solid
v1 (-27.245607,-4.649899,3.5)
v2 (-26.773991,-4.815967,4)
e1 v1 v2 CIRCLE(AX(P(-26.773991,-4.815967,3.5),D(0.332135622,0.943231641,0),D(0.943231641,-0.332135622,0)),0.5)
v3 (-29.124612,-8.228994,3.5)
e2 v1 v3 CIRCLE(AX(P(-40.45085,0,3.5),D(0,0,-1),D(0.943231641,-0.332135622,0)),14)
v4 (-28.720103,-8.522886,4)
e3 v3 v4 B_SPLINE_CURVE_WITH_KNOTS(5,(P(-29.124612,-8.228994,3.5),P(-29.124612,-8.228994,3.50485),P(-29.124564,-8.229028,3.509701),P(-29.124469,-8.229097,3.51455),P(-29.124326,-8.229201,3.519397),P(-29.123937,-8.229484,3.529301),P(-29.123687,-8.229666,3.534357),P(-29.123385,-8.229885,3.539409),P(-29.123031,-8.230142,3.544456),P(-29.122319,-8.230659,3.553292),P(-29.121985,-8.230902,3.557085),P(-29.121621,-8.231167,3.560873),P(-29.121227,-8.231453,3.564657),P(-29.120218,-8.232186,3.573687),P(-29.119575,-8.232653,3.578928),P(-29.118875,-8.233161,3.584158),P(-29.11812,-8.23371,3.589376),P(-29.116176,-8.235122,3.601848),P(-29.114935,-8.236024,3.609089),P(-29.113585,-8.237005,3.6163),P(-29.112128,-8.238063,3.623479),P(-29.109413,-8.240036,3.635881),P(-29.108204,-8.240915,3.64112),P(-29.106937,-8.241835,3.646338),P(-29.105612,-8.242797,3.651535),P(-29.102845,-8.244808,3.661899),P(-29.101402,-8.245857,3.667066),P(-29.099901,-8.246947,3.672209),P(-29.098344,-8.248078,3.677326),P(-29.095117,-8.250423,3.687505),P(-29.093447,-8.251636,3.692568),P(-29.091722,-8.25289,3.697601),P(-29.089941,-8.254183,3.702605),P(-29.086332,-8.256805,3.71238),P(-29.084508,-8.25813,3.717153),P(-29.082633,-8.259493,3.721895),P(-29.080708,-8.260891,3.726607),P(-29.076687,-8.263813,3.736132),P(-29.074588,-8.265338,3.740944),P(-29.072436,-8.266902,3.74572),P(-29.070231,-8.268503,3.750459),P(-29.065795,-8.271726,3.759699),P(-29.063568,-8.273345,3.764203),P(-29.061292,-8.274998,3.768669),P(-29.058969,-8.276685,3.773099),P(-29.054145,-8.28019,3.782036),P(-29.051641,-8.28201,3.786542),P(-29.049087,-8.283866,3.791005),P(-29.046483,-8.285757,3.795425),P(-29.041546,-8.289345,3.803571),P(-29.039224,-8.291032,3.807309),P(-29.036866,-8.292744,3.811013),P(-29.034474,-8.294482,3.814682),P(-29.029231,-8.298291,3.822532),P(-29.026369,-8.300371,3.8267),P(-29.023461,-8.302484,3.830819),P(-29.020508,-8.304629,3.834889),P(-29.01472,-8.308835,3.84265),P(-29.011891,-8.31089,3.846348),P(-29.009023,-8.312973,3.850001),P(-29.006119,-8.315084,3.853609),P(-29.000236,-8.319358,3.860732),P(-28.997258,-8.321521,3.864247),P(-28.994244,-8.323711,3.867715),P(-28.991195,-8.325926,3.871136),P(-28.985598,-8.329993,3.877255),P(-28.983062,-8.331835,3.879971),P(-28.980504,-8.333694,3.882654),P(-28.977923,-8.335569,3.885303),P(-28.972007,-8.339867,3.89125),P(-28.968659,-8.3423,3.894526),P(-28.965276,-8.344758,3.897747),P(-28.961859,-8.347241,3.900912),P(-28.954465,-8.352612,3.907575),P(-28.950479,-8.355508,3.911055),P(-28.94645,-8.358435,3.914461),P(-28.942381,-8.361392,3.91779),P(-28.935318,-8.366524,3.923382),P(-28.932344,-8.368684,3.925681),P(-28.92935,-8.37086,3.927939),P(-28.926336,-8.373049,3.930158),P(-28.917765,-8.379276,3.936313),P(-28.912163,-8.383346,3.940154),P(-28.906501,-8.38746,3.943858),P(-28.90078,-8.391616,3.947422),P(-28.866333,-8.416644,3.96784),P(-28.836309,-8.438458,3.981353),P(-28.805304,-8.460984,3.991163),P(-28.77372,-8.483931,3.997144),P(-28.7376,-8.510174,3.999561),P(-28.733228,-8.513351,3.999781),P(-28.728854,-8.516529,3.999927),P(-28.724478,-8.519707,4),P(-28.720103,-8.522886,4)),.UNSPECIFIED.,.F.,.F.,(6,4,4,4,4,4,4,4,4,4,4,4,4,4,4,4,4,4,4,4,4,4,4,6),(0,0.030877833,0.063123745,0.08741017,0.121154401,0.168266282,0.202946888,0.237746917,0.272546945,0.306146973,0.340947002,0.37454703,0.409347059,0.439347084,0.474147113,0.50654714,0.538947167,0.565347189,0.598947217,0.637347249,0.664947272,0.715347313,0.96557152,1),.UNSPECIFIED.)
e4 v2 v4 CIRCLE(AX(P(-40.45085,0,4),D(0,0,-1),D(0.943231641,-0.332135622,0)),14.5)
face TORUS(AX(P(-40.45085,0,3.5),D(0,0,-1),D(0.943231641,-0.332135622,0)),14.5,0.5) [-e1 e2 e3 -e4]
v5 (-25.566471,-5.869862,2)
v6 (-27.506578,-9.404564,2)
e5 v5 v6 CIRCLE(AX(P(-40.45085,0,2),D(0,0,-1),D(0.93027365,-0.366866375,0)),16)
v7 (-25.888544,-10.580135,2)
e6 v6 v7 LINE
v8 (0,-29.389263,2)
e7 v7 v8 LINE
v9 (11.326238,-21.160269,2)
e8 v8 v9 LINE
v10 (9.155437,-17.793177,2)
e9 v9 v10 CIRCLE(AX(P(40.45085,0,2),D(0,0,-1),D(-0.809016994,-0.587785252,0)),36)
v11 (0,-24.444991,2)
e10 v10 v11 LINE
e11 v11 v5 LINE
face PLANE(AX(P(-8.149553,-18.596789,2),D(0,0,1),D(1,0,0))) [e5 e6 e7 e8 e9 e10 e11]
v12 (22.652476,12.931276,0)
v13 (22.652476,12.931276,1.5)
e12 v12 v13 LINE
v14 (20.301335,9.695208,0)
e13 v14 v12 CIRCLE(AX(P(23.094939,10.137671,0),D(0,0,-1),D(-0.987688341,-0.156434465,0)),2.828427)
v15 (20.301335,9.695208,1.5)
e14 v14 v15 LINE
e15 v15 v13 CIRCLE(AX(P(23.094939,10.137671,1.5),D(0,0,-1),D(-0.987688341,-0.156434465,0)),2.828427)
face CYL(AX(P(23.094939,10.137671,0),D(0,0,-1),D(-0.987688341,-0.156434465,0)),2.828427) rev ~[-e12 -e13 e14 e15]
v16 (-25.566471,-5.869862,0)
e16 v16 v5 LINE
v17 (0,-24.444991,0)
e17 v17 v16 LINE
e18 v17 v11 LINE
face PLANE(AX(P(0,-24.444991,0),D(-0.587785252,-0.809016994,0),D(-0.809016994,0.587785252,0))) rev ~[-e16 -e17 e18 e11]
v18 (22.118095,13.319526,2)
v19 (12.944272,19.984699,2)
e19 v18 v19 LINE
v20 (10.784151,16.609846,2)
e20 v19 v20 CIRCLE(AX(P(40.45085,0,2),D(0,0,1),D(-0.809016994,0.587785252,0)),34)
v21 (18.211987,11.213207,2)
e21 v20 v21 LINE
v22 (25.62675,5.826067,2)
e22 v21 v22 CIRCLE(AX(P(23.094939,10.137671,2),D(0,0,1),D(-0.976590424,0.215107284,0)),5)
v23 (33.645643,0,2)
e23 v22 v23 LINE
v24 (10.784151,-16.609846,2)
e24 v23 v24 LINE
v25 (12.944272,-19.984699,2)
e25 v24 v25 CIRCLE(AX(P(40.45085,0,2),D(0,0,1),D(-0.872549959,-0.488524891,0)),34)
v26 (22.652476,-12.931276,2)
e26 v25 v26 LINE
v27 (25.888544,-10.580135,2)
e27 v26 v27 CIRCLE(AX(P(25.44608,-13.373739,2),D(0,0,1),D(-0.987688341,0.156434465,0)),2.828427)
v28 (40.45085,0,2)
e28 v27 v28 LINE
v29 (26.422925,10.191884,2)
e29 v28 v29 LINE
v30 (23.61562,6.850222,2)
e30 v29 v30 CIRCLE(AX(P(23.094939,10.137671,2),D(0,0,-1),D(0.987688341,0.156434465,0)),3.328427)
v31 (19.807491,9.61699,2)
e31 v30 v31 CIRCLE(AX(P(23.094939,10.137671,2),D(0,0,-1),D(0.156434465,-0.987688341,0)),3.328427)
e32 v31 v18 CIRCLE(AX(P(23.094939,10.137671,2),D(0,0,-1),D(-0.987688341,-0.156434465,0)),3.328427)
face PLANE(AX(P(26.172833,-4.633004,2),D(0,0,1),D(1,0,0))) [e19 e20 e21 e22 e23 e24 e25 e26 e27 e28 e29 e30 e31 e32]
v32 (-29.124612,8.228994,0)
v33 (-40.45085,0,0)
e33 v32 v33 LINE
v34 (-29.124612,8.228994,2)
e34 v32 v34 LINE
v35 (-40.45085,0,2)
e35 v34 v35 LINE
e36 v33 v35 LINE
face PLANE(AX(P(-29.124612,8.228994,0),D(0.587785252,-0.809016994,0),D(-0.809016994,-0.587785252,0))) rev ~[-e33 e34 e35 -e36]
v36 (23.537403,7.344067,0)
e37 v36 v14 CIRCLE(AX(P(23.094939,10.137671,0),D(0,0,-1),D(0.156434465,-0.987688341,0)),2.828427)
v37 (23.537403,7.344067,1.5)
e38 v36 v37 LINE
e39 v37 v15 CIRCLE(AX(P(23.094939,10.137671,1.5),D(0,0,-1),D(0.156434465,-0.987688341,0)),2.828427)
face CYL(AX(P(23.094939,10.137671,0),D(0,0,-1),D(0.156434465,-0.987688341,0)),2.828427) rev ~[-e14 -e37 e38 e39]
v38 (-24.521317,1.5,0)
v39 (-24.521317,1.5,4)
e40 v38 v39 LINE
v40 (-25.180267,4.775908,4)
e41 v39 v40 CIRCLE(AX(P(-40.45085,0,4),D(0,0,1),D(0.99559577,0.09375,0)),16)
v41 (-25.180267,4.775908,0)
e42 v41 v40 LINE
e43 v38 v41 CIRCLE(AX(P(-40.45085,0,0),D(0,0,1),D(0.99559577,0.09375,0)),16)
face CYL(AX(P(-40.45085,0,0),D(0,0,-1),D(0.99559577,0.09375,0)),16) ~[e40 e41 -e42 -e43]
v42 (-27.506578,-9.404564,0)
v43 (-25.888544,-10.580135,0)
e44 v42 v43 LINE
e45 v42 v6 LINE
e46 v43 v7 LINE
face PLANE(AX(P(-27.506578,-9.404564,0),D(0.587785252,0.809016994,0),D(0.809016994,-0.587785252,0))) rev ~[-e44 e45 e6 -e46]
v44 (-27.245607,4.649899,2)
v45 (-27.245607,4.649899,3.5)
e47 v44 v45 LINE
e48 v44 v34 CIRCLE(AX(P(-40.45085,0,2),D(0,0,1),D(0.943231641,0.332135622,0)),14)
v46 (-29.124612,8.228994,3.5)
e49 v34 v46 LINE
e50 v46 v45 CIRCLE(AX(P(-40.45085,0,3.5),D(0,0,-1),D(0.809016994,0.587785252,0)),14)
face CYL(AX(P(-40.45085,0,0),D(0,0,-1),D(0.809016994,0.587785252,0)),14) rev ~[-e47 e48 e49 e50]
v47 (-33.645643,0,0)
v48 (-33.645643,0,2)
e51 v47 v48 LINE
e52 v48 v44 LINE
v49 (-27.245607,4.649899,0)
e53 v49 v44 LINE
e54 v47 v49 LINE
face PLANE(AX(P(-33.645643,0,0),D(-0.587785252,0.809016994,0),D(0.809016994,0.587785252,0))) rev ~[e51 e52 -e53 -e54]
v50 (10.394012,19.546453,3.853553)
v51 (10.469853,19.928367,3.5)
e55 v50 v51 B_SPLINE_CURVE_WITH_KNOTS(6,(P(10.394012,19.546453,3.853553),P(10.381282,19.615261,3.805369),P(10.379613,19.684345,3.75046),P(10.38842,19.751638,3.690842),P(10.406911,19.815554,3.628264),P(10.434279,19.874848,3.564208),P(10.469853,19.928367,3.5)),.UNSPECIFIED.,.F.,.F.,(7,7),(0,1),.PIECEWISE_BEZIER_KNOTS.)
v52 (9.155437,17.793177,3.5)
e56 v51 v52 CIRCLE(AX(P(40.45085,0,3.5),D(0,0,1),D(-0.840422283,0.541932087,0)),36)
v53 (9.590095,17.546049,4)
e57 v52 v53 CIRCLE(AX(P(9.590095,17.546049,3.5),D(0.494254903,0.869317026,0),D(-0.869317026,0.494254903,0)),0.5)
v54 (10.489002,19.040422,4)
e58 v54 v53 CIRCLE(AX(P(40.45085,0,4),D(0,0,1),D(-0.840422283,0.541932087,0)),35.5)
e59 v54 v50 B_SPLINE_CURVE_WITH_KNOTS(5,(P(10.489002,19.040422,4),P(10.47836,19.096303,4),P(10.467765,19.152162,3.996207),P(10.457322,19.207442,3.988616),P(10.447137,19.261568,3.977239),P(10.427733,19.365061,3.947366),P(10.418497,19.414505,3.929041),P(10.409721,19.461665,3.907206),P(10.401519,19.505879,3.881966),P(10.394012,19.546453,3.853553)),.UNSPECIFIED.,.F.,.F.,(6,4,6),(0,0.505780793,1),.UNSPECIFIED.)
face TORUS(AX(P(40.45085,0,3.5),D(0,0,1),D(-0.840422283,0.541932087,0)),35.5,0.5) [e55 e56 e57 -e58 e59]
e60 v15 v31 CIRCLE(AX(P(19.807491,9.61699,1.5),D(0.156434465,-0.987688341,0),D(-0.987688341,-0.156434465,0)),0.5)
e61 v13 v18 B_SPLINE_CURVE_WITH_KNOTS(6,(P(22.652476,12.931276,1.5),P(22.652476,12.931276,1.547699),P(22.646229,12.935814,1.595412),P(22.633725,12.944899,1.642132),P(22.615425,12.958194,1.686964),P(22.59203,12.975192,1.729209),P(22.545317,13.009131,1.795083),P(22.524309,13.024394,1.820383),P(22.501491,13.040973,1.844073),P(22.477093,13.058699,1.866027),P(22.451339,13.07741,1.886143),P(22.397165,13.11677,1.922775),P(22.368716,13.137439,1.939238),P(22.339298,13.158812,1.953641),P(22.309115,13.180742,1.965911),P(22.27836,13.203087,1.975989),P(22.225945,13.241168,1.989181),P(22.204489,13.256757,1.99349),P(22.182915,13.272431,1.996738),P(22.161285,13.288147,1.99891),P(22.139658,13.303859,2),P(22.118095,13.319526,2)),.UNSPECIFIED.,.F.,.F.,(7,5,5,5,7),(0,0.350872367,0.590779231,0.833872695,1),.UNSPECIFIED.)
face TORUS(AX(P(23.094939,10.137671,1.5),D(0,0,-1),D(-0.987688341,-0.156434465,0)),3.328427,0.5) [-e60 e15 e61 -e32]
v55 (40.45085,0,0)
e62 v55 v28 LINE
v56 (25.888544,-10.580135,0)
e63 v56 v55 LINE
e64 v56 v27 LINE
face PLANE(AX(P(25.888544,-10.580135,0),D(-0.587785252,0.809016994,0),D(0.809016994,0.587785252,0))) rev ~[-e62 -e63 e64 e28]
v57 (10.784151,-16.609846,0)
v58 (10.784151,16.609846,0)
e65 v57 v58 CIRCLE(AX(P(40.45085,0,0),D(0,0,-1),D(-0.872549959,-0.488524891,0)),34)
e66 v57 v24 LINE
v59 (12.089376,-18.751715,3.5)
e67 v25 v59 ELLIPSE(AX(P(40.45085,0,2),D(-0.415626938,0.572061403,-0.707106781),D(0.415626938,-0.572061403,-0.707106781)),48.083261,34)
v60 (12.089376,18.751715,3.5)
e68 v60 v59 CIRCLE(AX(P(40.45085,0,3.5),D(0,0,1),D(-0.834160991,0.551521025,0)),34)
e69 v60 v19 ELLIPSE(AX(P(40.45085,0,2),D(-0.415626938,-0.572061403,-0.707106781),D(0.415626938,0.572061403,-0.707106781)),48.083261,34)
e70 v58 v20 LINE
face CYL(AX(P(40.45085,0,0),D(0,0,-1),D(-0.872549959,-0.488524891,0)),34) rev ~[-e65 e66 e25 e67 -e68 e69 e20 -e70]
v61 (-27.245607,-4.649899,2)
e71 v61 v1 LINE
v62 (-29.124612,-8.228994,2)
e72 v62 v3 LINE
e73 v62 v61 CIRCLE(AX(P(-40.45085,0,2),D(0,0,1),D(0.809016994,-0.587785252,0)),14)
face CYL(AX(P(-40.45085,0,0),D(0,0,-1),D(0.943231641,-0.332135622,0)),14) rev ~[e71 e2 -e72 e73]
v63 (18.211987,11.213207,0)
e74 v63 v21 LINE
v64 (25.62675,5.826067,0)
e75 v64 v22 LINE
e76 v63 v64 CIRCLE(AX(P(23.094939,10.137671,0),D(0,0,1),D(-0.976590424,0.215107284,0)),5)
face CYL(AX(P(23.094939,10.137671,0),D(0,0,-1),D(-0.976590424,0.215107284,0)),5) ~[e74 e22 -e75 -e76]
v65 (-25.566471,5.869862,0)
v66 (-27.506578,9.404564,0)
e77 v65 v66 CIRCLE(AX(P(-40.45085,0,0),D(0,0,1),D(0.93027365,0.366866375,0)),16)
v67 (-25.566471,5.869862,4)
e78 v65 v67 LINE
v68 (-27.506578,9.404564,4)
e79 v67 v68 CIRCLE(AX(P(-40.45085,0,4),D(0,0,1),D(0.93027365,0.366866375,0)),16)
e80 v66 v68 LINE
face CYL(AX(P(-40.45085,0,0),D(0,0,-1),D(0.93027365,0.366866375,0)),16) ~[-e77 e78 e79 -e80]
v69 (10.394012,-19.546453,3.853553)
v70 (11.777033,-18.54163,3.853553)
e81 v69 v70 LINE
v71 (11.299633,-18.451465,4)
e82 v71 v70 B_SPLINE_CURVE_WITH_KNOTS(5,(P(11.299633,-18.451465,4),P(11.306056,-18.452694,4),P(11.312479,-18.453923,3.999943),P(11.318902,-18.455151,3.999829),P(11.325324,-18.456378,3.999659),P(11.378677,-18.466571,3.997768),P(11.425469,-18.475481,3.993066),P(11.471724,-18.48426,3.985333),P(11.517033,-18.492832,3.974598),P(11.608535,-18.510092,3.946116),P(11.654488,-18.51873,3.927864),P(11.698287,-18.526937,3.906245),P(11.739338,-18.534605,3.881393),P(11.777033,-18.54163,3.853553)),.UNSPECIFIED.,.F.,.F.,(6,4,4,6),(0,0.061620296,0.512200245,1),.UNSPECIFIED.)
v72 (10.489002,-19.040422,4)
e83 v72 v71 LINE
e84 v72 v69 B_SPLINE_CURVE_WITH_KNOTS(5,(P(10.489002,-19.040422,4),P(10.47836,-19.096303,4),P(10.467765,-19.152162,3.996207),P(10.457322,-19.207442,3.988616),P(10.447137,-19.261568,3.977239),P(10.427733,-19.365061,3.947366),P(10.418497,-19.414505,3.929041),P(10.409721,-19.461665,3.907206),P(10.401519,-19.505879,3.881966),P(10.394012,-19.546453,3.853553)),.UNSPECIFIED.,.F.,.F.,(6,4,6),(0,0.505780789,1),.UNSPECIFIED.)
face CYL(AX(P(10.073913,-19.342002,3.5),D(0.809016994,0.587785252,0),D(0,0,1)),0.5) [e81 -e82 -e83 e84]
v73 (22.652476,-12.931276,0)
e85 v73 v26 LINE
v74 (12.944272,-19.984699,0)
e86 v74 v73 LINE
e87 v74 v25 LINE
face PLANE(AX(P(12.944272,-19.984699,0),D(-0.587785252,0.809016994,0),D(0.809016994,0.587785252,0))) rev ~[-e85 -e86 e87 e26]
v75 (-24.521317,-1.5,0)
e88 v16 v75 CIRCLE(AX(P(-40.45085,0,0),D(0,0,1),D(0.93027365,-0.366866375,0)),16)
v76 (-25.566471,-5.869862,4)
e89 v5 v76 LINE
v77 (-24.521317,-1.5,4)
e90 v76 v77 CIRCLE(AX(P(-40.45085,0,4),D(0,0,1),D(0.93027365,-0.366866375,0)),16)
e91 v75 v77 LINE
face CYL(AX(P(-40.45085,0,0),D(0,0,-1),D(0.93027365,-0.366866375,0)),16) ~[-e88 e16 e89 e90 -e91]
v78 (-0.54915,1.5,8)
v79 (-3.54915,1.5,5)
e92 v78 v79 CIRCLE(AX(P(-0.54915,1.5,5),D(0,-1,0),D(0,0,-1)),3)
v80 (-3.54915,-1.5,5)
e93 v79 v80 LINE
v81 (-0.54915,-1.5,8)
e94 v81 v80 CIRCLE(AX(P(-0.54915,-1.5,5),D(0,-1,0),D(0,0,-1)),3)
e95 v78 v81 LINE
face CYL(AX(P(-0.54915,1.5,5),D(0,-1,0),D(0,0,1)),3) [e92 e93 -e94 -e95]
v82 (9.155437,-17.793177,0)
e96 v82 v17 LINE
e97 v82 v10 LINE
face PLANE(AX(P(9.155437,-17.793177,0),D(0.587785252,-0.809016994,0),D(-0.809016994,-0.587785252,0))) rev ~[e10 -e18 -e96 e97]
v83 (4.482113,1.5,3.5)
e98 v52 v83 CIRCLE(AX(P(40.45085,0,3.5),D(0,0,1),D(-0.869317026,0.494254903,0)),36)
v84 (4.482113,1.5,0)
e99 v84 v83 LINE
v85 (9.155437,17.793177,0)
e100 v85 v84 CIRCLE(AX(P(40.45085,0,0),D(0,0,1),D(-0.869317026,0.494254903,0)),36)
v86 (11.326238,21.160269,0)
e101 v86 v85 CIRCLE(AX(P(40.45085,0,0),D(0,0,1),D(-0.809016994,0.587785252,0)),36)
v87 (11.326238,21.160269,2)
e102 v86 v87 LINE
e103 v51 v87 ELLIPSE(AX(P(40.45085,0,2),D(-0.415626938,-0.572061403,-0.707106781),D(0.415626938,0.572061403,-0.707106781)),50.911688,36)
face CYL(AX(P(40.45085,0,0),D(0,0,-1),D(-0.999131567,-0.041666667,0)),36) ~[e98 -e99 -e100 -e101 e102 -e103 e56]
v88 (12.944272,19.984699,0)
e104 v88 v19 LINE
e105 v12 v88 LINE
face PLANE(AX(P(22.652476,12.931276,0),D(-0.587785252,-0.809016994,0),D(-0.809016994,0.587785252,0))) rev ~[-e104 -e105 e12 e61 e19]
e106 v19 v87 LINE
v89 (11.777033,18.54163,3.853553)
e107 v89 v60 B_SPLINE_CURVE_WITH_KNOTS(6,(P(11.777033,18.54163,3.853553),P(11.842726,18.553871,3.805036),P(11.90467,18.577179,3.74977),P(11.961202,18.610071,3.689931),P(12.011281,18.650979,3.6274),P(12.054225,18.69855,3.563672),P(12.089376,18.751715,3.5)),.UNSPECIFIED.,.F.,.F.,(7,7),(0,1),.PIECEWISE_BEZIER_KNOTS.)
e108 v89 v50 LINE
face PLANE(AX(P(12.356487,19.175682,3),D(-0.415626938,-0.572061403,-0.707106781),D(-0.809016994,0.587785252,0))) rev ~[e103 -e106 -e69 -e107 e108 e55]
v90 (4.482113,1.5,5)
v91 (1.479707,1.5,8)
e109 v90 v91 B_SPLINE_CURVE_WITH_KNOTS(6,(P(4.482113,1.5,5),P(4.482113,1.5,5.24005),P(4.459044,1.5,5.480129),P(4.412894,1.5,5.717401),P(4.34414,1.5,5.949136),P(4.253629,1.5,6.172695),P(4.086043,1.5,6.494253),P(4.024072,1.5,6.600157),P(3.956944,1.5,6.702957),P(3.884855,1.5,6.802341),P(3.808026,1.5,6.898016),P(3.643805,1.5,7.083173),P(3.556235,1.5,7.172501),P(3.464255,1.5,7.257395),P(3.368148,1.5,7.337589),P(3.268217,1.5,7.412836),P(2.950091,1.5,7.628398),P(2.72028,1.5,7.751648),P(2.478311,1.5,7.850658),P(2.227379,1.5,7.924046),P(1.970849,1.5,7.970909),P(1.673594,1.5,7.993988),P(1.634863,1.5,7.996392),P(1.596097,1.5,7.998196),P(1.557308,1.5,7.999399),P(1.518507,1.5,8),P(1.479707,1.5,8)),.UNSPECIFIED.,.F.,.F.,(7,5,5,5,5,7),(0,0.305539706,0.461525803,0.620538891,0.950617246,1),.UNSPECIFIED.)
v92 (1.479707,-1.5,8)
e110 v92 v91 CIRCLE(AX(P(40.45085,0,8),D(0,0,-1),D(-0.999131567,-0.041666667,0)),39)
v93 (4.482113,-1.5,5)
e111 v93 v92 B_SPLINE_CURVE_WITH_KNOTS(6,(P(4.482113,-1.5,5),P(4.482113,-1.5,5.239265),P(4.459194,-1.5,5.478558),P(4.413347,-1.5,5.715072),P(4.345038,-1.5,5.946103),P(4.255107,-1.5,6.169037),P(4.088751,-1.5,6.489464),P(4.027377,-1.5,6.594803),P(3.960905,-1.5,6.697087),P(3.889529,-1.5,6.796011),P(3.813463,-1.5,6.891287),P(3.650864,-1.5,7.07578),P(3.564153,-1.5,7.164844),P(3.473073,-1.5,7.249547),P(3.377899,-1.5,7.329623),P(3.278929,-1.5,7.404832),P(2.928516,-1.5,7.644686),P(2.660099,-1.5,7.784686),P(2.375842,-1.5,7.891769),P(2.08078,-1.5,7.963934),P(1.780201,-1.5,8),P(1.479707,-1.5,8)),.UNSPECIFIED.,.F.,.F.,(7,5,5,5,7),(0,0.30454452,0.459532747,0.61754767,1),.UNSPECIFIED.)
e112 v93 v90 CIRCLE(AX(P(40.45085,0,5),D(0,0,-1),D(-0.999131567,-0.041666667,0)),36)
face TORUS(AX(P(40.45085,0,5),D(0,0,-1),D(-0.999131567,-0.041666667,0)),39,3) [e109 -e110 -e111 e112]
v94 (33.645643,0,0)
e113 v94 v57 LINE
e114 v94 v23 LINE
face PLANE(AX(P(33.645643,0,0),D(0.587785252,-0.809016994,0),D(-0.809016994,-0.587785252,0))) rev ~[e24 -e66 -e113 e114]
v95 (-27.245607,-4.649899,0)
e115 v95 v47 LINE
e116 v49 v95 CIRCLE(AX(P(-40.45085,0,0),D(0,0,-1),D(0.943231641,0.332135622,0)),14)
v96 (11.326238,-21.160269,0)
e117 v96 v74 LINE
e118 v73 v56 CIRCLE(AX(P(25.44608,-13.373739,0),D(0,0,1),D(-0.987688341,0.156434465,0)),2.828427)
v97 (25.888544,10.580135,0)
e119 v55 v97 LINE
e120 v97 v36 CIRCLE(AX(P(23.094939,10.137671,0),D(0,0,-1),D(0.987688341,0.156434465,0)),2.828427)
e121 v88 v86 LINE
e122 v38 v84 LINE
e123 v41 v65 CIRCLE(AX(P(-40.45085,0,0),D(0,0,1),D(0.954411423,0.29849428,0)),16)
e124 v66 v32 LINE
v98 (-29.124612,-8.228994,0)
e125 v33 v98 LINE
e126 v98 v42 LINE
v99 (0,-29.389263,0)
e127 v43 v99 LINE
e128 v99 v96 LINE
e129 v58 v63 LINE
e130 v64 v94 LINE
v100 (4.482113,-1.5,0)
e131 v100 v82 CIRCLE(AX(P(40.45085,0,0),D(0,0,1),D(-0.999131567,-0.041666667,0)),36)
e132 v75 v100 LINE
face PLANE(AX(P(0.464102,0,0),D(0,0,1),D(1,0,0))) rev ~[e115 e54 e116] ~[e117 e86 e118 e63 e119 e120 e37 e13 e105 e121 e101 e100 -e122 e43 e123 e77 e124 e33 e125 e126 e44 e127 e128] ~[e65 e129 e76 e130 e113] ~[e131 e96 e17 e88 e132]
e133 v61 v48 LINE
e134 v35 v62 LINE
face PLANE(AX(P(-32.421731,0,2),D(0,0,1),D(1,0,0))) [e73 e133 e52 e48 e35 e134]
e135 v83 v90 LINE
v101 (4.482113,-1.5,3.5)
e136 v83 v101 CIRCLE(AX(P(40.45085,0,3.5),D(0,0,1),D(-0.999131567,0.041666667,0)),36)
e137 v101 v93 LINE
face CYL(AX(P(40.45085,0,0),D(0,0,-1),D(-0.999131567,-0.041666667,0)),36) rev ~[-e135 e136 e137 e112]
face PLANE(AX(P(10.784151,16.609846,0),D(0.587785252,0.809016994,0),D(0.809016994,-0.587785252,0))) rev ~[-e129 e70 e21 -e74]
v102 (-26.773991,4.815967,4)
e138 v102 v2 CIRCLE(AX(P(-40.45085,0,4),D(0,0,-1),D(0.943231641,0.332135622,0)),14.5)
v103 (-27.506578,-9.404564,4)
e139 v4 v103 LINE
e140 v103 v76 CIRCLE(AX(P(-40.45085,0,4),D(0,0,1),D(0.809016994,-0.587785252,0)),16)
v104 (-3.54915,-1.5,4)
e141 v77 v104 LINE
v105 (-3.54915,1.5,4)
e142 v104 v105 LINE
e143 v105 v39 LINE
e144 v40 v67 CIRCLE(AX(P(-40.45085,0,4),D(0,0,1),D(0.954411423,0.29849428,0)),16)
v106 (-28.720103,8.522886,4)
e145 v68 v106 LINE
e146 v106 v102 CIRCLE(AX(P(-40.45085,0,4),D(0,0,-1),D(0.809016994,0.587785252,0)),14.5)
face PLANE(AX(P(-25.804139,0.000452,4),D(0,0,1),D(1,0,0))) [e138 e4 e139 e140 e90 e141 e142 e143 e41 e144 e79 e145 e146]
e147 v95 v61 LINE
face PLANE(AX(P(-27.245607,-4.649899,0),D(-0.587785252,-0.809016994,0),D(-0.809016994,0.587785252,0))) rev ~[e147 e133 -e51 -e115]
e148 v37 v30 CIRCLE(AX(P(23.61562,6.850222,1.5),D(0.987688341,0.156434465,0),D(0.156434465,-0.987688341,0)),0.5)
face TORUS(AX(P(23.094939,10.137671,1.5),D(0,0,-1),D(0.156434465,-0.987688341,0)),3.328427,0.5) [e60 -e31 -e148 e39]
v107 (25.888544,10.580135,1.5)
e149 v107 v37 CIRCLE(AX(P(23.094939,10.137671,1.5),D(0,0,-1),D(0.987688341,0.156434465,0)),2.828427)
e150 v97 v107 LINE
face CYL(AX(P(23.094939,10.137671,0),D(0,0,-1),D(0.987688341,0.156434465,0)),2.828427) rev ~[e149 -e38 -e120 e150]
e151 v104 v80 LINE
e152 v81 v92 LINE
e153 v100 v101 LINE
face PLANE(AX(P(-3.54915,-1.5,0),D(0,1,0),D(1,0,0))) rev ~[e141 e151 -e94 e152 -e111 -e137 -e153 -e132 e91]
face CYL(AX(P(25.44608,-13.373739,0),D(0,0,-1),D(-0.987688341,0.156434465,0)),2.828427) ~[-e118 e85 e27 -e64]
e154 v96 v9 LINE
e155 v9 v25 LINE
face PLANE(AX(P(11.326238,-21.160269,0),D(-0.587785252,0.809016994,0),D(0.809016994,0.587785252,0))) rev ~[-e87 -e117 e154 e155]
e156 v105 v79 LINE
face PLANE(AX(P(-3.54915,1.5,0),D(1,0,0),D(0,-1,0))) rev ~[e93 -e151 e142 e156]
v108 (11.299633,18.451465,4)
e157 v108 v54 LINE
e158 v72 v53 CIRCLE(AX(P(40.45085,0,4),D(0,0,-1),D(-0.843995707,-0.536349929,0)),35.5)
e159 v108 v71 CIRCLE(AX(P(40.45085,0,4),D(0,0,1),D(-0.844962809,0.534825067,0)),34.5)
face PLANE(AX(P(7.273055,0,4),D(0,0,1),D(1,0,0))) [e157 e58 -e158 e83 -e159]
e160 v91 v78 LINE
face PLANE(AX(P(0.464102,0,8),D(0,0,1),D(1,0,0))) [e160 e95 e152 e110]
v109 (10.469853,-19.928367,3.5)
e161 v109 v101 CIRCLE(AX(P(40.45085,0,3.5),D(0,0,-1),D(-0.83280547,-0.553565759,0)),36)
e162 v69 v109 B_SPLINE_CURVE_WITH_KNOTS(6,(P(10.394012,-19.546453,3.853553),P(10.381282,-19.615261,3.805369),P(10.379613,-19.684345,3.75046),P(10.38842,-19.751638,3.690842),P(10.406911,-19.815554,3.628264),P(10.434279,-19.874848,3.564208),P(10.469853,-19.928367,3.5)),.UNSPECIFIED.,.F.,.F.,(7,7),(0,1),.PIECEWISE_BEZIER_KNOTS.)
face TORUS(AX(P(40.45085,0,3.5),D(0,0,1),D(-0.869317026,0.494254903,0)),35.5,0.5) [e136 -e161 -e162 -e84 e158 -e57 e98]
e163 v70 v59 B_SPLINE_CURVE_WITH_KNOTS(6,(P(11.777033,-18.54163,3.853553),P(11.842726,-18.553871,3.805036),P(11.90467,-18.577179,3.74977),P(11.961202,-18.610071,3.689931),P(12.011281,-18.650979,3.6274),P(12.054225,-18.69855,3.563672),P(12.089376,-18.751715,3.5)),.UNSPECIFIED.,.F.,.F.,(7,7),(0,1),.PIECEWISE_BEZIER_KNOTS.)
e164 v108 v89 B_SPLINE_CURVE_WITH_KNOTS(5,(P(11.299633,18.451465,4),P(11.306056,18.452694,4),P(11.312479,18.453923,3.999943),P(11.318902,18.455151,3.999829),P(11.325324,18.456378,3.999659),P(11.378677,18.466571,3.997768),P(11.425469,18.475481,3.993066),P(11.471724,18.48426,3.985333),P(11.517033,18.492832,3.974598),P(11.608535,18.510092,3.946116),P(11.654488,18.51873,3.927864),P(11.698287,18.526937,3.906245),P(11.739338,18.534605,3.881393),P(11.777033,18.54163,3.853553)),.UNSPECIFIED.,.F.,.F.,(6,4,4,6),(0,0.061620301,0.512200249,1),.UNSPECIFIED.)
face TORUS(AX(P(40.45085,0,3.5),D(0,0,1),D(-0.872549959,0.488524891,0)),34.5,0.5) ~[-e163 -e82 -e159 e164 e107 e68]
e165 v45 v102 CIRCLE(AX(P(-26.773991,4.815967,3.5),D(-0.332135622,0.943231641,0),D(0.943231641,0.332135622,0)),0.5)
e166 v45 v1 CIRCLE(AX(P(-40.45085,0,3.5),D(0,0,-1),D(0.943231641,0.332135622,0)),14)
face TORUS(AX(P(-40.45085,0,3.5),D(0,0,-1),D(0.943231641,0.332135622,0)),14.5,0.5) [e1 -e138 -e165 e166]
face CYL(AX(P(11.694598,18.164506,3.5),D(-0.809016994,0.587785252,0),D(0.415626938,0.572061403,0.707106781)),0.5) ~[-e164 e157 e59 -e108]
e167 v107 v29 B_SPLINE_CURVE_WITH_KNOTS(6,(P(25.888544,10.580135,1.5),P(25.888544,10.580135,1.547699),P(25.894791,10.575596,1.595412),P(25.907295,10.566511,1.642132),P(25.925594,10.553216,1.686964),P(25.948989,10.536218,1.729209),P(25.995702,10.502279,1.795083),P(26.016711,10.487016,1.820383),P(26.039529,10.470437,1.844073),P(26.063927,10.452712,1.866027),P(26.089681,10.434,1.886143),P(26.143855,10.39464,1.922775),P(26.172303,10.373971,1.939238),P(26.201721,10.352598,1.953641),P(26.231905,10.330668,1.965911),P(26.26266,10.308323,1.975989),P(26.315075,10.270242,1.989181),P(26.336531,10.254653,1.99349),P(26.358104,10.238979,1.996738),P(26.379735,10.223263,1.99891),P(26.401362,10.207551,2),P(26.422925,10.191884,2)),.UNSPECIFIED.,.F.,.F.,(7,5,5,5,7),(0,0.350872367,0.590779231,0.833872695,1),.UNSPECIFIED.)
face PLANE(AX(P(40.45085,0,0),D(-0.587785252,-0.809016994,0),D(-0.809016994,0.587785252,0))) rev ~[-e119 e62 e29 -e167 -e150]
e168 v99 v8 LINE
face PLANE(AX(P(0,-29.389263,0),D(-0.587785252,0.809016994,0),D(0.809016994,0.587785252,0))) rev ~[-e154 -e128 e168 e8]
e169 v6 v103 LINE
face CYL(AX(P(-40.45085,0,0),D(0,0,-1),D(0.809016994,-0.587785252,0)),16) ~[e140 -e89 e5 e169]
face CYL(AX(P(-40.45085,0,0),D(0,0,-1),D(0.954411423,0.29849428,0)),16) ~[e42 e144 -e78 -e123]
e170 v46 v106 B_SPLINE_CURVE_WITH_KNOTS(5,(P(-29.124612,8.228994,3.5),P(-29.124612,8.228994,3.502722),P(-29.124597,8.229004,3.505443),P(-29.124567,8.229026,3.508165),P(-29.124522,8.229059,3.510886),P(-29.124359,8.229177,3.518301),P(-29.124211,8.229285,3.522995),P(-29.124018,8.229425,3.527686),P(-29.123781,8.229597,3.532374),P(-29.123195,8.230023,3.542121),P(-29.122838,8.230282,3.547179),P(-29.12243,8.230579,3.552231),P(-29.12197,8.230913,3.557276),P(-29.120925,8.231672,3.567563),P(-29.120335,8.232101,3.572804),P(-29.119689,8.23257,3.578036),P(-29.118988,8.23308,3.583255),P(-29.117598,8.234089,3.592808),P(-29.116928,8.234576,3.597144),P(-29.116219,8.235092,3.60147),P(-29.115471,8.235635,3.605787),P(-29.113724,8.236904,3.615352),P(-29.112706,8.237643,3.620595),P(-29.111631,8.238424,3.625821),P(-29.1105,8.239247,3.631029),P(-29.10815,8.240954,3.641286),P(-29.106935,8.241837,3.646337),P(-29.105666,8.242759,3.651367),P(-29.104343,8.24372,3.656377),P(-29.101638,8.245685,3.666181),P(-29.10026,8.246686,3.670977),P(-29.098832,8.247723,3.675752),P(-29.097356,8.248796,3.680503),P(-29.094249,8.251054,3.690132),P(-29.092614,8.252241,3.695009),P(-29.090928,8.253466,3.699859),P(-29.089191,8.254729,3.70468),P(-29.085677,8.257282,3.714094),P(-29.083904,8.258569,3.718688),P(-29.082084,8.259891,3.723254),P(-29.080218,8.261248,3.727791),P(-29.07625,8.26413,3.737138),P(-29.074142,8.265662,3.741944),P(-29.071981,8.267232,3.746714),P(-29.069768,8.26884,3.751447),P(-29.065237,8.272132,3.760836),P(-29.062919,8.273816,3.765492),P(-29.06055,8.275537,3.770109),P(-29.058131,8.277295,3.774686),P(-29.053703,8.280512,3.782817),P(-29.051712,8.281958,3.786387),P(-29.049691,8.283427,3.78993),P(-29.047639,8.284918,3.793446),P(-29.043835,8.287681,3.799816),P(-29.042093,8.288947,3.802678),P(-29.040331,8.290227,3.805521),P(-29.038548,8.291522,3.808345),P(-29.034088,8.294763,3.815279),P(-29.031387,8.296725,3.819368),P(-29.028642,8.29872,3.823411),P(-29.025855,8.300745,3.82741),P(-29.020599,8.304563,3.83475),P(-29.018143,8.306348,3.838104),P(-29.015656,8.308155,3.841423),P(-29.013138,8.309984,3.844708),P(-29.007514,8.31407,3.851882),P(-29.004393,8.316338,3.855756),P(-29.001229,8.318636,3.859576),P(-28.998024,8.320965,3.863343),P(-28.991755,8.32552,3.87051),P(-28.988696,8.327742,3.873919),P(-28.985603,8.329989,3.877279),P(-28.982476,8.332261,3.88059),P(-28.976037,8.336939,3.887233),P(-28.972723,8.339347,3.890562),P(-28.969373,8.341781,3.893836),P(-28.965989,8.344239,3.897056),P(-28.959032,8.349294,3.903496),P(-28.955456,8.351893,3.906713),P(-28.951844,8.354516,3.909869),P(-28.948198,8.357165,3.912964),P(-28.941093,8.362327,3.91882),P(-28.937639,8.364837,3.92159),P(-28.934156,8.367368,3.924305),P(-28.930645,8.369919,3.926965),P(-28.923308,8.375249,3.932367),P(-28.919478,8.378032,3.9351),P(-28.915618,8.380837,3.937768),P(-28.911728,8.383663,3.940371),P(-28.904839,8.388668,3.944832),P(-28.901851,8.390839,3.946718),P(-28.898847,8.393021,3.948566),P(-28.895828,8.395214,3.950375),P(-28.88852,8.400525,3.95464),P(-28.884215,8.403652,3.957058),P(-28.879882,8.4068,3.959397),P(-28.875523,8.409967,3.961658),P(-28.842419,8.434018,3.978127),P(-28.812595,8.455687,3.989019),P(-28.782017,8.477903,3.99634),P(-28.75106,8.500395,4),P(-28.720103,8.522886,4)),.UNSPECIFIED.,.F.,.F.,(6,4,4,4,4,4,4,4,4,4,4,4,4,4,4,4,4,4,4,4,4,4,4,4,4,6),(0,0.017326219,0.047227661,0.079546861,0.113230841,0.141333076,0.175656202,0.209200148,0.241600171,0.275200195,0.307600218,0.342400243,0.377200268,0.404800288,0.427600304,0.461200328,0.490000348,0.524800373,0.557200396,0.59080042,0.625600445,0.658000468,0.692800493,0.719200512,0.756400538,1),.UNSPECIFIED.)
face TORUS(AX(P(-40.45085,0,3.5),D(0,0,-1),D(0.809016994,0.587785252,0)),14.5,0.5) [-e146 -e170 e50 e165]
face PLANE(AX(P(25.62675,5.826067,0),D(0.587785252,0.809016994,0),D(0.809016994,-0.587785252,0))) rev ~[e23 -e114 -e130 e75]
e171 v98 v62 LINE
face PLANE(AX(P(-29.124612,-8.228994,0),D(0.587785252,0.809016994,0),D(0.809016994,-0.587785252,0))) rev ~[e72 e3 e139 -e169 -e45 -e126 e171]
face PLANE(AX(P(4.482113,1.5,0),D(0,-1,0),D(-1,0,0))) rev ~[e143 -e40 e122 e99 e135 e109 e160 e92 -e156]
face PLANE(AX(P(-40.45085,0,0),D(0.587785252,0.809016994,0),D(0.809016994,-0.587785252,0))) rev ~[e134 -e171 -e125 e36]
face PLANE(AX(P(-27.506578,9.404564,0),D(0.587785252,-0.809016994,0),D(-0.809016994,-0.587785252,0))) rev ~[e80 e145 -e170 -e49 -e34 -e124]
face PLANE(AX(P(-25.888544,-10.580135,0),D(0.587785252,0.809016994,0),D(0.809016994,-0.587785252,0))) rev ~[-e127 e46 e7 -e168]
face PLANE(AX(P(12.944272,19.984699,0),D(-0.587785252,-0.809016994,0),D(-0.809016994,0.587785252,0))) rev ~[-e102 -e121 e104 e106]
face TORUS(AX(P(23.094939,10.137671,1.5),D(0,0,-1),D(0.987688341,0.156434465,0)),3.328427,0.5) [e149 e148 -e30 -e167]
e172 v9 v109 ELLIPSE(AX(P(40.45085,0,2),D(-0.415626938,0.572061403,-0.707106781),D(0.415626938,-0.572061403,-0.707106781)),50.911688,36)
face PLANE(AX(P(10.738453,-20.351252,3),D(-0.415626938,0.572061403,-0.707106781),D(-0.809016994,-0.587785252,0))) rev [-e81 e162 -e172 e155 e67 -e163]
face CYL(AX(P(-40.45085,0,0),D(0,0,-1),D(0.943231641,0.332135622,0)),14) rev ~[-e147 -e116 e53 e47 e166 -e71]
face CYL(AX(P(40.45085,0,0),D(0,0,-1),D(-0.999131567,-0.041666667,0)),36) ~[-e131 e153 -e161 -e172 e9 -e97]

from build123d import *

# Parameters (mm, degrees)
F1_DEPTH = 2
F2_R     = 0.5
F3_DEPTH = 4
F4_SIZE  = 2
F5_R     = 0.5
F6_DEPTH = 8
F7_R     = 3


# Not quite as in the source:
# - a feature names something its author has since deleted; it is built from what else it names


with BuildPart() as f1:
    # F0 (on Top) → F1 (new body)
    with BuildSketch(Plane.XY):
        with BuildLine():
            Line((25.88854382, -10.5801345413), (40.4508497187, 0))
            Line((40.4508497187, 0), (25.88854382, 10.5801345413))
            ThreePointArc((25.88854382, 10.5801345413), (25.3831849379, 8.475163306), (23.5374028108, 7.3440665638))
            Line((23.5374028108, 7.3440665638), (25.6267504373, 5.8260666573))
            Line((25.6267504373, 5.8260666573), (33.6456432519, 0))
            Line((33.6456432519, 0), (10.7841511133, -16.6098462924))
            ThreePointArc((10.7841511133, -16.6098462924), (11.814451709, -18.3291218838), (12.94427191, -19.9846985779))
            Line((12.94427191, -19.9846985779), (22.6524758425, -12.9312755504))
            Line((22.6524758425, -12.9312755504), (25.88854382, -10.5801345413))
        make_face()
        with BuildLine():
            ThreePointArc((22.6524758425, -12.9312755504), (27.1085880869, -15.6619846459), (25.88854382, -10.5801345413))
            Line((25.88854382, -10.5801345413), (22.6524758425, -12.9312755504))
        make_face()
        with BuildLine():
            Line((25.6267504373, 5.8260666573), (23.5374028108, 7.3440665638))
            ThreePointArc((23.5374028108, 7.3440665638), (21.4324315756, 7.8494254458), (20.3013348333, 9.6952075729))
            Line((20.3013348333, 9.6952075729), (18.2119872068, 11.2132074794))
            ThreePointArc((18.2119872068, 11.2132074794), (20.1560130652, 6.0925860852), (25.6267504373, 5.8260666573))
        make_face()
        with BuildLine():
            Line((18.2119872068, 11.2132074794), (20.3013348333, 9.6952075729))
            ThreePointArc((20.3013348333, 9.6952075729), (20.8066937154, 11.8001788082), (22.6524758425, 12.9312755504))
            Line((22.6524758425, 12.9312755504), (12.94427191, 19.9846985779))
            ThreePointArc((12.94427191, 19.9846985779), (11.814451709, 18.3291218838), (10.7841511133, 16.6098462924))
            Line((10.7841511133, 16.6098462924), (18.2119872068, 11.2132074794))
        make_face()
    extrude(amount=F1_DEPTH)

    # F2
    f2_edges = [f1.edges().sort_by_distance(p)[0] for p in [
        (21.432432, 7.849425, 2),
    ]]
    fillet(f2_edges, radius=F2_R)



with BuildPart() as f1b:
    # F0 (on Top) → F1, piece 2 (new body)
    with BuildSketch(Plane.XY):
        with BuildLine():
            Line((0, -29.3892626146), (11.3262379212, -21.1602690825))
            ThreePointArc((11.3262379212, -21.1602690825), (10.1939633159, -19.506943), (9.1554367996, -17.7931765073))
            Line((9.1554367996, -17.7931765073), (0, -24.4449907046))
            Line((0, -24.4449907046), (-25.5664713255, -5.8698619956))
            ThreePointArc((-25.5664713255, -5.8698619956), (-26.4247321499, -7.6985729811), (-27.5065778087, -9.4045640367))
            Line((-27.5065778087, -9.4045640367), (-25.88854382, -10.5801345413))
            Line((-25.88854382, -10.5801345413), (-14.5623058987, -18.8091280734))
            Line((-14.5623058987, -18.8091280734), (0, -29.3892626146))
        make_face()
    extrude(amount=F1_DEPTH)


with BuildPart() as f1c:
    # F0 (on Top) → F1, piece 3 (new body)
    with BuildSketch(Plane.XY):
        with BuildLine():
            Line((9.1554367996, -17.7931765073), (10.7841511133, -16.6098462924))
            ThreePointArc((10.7841511133, -16.6098462924), (6.4508497187, 0), (10.7841511133, 16.6098462924))
            Line((10.7841511133, 16.6098462924), (9.1554367996, 17.7931765073))
            ThreePointArc((9.1554367996, 17.7931765073), (5.8461773909, 9.9255555553), (4.4821132939, 1.5))
            ThreePointArc((4.4821132939, 1.5), (4.4508497187, 0), (4.4821132939, -1.5))
            ThreePointArc((4.4821132939, -1.5), (5.8461773909, -9.9255555553), (9.1554367996, -17.7931765073))
        make_face()
    extrude(amount=F1_DEPTH)


with BuildPart() as f1d:
    # F0 (on Top) → F1, piece 4 (new body)
    with BuildSketch(Plane.XY):
        with BuildLine():
            ThreePointArc((-29.1246117975, -8.2289935321), (-28.0552509558, -6.5076210175), (-27.2456067433, -4.6498987043))
            Line((-27.2456067433, -4.6498987043), (-33.6456432519, 0))
            Line((-33.6456432519, 0), (-27.2456067433, 4.6498987043))
            ThreePointArc((-27.2456067433, 4.6498987043), (-28.0552509558, 6.5076210175), (-29.1246117975, 8.2289935321))
            Line((-29.1246117975, 8.2289935321), (-40.4508497187, 0))
            Line((-40.4508497187, 0), (-29.1246117975, -8.2289935321))
        make_face()
    extrude(amount=F1_DEPTH)


with BuildPart() as f1_1:
    add(f1.part)

    add(f1b.part)  # F3 merges F1b

    add(f1c.part)  # F3 merges F1c

    add(f1d.part)  # F3 merges F1d
    # F0 (on Top) → F3 (join)
    with BuildSketch(Plane.XY):
        with BuildLine():
            Line((-27.2456067433, -4.6498987043), (-25.5664713255, -5.8698619956))
            ThreePointArc((-25.5664713255, -5.8698619956), (-24.8897380342, -3.7218010616), (-24.5213173967, -1.5))
            ThreePointArc((-24.5213173967, -1.5), (-24.4508497187, 0), (-24.5213173967, 1.5))
            ThreePointArc((-24.5213173967, 1.5), (-24.7650379905, 3.1552037061), (-25.1802669457, 4.7759084761))
            ThreePointArc((-25.1802669457, 4.7759084761), (-25.3634508604, 5.3263867387), (-25.5664713255, 5.8698619956))
            Line((-25.5664713255, 5.8698619956), (-27.2456067433, 4.6498987043))
            ThreePointArc((-27.2456067433, 4.6498987043), (-26.4508497187, 0), (-27.2456067433, -4.6498987043))
        make_face()
        with BuildLine():
            Line((9.1554367996, -17.7931765073), (10.7841511133, -16.6098462924))
            ThreePointArc((10.7841511133, -16.6098462924), (6.4508497187, 0), (10.7841511133, 16.6098462924))
            Line((10.7841511133, 16.6098462924), (9.1554367996, 17.7931765073))
            ThreePointArc((9.1554367996, 17.7931765073), (5.8461773909, 9.9255555553), (4.4821132939, 1.5))
            ThreePointArc((4.4821132939, 1.5), (4.4508497187, 0), (4.4821132939, -1.5))
            ThreePointArc((4.4821132939, -1.5), (5.8461773909, -9.9255555553), (9.1554367996, -17.7931765073))
        make_face()
        with BuildLine():
            Line((11.3262379212, -21.1602690825), (12.94427191, -19.9846985779))
            ThreePointArc((12.94427191, -19.9846985779), (11.814451709, -18.3291218838), (10.7841511133, -16.6098462924))
            Line((10.7841511133, -16.6098462924), (9.1554367996, -17.7931765073))
            ThreePointArc((9.1554367996, -17.7931765073), (10.1939633159, -19.506943), (11.3262379212, -21.1602690825))
        make_face()
        with BuildLine():
            Line((9.1554367996, 17.7931765073), (10.7841511133, 16.6098462924))
            ThreePointArc((10.7841511133, 16.6098462924), (11.814451709, 18.3291218838), (12.94427191, 19.9846985779))
            Line((12.94427191, 19.9846985779), (11.3262379212, 21.1602690825))
            ThreePointArc((11.3262379212, 21.1602690825), (10.1939633159, 19.506943), (9.1554367996, 17.7931765073))
        make_face()
        with BuildLine():
            Line((-24.5213173967, -1.5), (-3.5491502813, -1.5))
            Line((-3.5491502813, -1.5), (-3.5491502813, 1.5))
            Line((-3.5491502813, 1.5), (-24.5213173967, 1.5))
            ThreePointArc((-24.5213173967, 1.5), (-24.4508497187, 0), (-24.5213173967, -1.5))
        make_face()
        with BuildLine():
            ThreePointArc((-27.5065778087, -9.4045640367), (-26.4247321499, -7.6985729811), (-25.5664713255, -5.8698619956))
            Line((-25.5664713255, -5.8698619956), (-27.2456067433, -4.6498987043))
            ThreePointArc((-27.2456067433, -4.6498987043), (-28.0552509558, -6.5076210175), (-29.1246117975, -8.2289935321))
            Line((-29.1246117975, -8.2289935321), (-27.5065778087, -9.4045640367))
        make_face()
        with BuildLine():
            ThreePointArc((-25.5664713255, 5.8698619956), (-26.4247321499, 7.6985729811), (-27.5065778087, 9.4045640367))
            Line((-27.5065778087, 9.4045640367), (-29.1246117975, 8.2289935321))
            ThreePointArc((-29.1246117975, 8.2289935321), (-28.0552509558, 6.5076210175), (-27.2456067433, 4.6498987043))
            Line((-27.2456067433, 4.6498987043), (-25.5664713255, 5.8698619956))
        make_face()
    extrude(amount=F3_DEPTH)

    # F4
    f4_edges = [f1_1.edges().sort_by_distance(p)[0] for p in [
        (12.135255, 20.572484, 4),
        (12.135255, -20.572484, 4),
    ]]
    chamfer(f4_edges, length=F4_SIZE)

    # F5
    f5_edges = [f1_1.edges().sort_by_distance(p)[0] for p in [
        (-26.45085, 0, 4),
        (11.00599, 18.920807, 4),
        (4.45085, 0, 4),
        (6.45085, 0, 4),
        (11.00599, -18.920807, 4),
    ]]
    fillet(f5_edges, radius=F5_R)

    # F0 (on Top) → F6 (join)
    with BuildSketch(Plane.XY):
        with BuildLine():
            Line((-3.5491502813, -1.5), (4.4821132939, -1.5))
            ThreePointArc((4.4821132939, -1.5), (4.4508497187, 0), (4.4821132939, 1.5))
            Line((4.4821132939, 1.5), (-3.5491502813, 1.5))
            Line((-3.5491502813, 1.5), (-3.5491502813, -1.5))
        make_face()
    extrude(amount=F6_DEPTH)

    # F7
    f7_edges = [f1_1.edges().sort_by_distance(p)[0] for p in [
        (4.45085, 0, 8),
        (-3.54915, 0, 8),
    ]]
    fillet(f7_edges, radius=F7_R)


solid = f1_1.part
